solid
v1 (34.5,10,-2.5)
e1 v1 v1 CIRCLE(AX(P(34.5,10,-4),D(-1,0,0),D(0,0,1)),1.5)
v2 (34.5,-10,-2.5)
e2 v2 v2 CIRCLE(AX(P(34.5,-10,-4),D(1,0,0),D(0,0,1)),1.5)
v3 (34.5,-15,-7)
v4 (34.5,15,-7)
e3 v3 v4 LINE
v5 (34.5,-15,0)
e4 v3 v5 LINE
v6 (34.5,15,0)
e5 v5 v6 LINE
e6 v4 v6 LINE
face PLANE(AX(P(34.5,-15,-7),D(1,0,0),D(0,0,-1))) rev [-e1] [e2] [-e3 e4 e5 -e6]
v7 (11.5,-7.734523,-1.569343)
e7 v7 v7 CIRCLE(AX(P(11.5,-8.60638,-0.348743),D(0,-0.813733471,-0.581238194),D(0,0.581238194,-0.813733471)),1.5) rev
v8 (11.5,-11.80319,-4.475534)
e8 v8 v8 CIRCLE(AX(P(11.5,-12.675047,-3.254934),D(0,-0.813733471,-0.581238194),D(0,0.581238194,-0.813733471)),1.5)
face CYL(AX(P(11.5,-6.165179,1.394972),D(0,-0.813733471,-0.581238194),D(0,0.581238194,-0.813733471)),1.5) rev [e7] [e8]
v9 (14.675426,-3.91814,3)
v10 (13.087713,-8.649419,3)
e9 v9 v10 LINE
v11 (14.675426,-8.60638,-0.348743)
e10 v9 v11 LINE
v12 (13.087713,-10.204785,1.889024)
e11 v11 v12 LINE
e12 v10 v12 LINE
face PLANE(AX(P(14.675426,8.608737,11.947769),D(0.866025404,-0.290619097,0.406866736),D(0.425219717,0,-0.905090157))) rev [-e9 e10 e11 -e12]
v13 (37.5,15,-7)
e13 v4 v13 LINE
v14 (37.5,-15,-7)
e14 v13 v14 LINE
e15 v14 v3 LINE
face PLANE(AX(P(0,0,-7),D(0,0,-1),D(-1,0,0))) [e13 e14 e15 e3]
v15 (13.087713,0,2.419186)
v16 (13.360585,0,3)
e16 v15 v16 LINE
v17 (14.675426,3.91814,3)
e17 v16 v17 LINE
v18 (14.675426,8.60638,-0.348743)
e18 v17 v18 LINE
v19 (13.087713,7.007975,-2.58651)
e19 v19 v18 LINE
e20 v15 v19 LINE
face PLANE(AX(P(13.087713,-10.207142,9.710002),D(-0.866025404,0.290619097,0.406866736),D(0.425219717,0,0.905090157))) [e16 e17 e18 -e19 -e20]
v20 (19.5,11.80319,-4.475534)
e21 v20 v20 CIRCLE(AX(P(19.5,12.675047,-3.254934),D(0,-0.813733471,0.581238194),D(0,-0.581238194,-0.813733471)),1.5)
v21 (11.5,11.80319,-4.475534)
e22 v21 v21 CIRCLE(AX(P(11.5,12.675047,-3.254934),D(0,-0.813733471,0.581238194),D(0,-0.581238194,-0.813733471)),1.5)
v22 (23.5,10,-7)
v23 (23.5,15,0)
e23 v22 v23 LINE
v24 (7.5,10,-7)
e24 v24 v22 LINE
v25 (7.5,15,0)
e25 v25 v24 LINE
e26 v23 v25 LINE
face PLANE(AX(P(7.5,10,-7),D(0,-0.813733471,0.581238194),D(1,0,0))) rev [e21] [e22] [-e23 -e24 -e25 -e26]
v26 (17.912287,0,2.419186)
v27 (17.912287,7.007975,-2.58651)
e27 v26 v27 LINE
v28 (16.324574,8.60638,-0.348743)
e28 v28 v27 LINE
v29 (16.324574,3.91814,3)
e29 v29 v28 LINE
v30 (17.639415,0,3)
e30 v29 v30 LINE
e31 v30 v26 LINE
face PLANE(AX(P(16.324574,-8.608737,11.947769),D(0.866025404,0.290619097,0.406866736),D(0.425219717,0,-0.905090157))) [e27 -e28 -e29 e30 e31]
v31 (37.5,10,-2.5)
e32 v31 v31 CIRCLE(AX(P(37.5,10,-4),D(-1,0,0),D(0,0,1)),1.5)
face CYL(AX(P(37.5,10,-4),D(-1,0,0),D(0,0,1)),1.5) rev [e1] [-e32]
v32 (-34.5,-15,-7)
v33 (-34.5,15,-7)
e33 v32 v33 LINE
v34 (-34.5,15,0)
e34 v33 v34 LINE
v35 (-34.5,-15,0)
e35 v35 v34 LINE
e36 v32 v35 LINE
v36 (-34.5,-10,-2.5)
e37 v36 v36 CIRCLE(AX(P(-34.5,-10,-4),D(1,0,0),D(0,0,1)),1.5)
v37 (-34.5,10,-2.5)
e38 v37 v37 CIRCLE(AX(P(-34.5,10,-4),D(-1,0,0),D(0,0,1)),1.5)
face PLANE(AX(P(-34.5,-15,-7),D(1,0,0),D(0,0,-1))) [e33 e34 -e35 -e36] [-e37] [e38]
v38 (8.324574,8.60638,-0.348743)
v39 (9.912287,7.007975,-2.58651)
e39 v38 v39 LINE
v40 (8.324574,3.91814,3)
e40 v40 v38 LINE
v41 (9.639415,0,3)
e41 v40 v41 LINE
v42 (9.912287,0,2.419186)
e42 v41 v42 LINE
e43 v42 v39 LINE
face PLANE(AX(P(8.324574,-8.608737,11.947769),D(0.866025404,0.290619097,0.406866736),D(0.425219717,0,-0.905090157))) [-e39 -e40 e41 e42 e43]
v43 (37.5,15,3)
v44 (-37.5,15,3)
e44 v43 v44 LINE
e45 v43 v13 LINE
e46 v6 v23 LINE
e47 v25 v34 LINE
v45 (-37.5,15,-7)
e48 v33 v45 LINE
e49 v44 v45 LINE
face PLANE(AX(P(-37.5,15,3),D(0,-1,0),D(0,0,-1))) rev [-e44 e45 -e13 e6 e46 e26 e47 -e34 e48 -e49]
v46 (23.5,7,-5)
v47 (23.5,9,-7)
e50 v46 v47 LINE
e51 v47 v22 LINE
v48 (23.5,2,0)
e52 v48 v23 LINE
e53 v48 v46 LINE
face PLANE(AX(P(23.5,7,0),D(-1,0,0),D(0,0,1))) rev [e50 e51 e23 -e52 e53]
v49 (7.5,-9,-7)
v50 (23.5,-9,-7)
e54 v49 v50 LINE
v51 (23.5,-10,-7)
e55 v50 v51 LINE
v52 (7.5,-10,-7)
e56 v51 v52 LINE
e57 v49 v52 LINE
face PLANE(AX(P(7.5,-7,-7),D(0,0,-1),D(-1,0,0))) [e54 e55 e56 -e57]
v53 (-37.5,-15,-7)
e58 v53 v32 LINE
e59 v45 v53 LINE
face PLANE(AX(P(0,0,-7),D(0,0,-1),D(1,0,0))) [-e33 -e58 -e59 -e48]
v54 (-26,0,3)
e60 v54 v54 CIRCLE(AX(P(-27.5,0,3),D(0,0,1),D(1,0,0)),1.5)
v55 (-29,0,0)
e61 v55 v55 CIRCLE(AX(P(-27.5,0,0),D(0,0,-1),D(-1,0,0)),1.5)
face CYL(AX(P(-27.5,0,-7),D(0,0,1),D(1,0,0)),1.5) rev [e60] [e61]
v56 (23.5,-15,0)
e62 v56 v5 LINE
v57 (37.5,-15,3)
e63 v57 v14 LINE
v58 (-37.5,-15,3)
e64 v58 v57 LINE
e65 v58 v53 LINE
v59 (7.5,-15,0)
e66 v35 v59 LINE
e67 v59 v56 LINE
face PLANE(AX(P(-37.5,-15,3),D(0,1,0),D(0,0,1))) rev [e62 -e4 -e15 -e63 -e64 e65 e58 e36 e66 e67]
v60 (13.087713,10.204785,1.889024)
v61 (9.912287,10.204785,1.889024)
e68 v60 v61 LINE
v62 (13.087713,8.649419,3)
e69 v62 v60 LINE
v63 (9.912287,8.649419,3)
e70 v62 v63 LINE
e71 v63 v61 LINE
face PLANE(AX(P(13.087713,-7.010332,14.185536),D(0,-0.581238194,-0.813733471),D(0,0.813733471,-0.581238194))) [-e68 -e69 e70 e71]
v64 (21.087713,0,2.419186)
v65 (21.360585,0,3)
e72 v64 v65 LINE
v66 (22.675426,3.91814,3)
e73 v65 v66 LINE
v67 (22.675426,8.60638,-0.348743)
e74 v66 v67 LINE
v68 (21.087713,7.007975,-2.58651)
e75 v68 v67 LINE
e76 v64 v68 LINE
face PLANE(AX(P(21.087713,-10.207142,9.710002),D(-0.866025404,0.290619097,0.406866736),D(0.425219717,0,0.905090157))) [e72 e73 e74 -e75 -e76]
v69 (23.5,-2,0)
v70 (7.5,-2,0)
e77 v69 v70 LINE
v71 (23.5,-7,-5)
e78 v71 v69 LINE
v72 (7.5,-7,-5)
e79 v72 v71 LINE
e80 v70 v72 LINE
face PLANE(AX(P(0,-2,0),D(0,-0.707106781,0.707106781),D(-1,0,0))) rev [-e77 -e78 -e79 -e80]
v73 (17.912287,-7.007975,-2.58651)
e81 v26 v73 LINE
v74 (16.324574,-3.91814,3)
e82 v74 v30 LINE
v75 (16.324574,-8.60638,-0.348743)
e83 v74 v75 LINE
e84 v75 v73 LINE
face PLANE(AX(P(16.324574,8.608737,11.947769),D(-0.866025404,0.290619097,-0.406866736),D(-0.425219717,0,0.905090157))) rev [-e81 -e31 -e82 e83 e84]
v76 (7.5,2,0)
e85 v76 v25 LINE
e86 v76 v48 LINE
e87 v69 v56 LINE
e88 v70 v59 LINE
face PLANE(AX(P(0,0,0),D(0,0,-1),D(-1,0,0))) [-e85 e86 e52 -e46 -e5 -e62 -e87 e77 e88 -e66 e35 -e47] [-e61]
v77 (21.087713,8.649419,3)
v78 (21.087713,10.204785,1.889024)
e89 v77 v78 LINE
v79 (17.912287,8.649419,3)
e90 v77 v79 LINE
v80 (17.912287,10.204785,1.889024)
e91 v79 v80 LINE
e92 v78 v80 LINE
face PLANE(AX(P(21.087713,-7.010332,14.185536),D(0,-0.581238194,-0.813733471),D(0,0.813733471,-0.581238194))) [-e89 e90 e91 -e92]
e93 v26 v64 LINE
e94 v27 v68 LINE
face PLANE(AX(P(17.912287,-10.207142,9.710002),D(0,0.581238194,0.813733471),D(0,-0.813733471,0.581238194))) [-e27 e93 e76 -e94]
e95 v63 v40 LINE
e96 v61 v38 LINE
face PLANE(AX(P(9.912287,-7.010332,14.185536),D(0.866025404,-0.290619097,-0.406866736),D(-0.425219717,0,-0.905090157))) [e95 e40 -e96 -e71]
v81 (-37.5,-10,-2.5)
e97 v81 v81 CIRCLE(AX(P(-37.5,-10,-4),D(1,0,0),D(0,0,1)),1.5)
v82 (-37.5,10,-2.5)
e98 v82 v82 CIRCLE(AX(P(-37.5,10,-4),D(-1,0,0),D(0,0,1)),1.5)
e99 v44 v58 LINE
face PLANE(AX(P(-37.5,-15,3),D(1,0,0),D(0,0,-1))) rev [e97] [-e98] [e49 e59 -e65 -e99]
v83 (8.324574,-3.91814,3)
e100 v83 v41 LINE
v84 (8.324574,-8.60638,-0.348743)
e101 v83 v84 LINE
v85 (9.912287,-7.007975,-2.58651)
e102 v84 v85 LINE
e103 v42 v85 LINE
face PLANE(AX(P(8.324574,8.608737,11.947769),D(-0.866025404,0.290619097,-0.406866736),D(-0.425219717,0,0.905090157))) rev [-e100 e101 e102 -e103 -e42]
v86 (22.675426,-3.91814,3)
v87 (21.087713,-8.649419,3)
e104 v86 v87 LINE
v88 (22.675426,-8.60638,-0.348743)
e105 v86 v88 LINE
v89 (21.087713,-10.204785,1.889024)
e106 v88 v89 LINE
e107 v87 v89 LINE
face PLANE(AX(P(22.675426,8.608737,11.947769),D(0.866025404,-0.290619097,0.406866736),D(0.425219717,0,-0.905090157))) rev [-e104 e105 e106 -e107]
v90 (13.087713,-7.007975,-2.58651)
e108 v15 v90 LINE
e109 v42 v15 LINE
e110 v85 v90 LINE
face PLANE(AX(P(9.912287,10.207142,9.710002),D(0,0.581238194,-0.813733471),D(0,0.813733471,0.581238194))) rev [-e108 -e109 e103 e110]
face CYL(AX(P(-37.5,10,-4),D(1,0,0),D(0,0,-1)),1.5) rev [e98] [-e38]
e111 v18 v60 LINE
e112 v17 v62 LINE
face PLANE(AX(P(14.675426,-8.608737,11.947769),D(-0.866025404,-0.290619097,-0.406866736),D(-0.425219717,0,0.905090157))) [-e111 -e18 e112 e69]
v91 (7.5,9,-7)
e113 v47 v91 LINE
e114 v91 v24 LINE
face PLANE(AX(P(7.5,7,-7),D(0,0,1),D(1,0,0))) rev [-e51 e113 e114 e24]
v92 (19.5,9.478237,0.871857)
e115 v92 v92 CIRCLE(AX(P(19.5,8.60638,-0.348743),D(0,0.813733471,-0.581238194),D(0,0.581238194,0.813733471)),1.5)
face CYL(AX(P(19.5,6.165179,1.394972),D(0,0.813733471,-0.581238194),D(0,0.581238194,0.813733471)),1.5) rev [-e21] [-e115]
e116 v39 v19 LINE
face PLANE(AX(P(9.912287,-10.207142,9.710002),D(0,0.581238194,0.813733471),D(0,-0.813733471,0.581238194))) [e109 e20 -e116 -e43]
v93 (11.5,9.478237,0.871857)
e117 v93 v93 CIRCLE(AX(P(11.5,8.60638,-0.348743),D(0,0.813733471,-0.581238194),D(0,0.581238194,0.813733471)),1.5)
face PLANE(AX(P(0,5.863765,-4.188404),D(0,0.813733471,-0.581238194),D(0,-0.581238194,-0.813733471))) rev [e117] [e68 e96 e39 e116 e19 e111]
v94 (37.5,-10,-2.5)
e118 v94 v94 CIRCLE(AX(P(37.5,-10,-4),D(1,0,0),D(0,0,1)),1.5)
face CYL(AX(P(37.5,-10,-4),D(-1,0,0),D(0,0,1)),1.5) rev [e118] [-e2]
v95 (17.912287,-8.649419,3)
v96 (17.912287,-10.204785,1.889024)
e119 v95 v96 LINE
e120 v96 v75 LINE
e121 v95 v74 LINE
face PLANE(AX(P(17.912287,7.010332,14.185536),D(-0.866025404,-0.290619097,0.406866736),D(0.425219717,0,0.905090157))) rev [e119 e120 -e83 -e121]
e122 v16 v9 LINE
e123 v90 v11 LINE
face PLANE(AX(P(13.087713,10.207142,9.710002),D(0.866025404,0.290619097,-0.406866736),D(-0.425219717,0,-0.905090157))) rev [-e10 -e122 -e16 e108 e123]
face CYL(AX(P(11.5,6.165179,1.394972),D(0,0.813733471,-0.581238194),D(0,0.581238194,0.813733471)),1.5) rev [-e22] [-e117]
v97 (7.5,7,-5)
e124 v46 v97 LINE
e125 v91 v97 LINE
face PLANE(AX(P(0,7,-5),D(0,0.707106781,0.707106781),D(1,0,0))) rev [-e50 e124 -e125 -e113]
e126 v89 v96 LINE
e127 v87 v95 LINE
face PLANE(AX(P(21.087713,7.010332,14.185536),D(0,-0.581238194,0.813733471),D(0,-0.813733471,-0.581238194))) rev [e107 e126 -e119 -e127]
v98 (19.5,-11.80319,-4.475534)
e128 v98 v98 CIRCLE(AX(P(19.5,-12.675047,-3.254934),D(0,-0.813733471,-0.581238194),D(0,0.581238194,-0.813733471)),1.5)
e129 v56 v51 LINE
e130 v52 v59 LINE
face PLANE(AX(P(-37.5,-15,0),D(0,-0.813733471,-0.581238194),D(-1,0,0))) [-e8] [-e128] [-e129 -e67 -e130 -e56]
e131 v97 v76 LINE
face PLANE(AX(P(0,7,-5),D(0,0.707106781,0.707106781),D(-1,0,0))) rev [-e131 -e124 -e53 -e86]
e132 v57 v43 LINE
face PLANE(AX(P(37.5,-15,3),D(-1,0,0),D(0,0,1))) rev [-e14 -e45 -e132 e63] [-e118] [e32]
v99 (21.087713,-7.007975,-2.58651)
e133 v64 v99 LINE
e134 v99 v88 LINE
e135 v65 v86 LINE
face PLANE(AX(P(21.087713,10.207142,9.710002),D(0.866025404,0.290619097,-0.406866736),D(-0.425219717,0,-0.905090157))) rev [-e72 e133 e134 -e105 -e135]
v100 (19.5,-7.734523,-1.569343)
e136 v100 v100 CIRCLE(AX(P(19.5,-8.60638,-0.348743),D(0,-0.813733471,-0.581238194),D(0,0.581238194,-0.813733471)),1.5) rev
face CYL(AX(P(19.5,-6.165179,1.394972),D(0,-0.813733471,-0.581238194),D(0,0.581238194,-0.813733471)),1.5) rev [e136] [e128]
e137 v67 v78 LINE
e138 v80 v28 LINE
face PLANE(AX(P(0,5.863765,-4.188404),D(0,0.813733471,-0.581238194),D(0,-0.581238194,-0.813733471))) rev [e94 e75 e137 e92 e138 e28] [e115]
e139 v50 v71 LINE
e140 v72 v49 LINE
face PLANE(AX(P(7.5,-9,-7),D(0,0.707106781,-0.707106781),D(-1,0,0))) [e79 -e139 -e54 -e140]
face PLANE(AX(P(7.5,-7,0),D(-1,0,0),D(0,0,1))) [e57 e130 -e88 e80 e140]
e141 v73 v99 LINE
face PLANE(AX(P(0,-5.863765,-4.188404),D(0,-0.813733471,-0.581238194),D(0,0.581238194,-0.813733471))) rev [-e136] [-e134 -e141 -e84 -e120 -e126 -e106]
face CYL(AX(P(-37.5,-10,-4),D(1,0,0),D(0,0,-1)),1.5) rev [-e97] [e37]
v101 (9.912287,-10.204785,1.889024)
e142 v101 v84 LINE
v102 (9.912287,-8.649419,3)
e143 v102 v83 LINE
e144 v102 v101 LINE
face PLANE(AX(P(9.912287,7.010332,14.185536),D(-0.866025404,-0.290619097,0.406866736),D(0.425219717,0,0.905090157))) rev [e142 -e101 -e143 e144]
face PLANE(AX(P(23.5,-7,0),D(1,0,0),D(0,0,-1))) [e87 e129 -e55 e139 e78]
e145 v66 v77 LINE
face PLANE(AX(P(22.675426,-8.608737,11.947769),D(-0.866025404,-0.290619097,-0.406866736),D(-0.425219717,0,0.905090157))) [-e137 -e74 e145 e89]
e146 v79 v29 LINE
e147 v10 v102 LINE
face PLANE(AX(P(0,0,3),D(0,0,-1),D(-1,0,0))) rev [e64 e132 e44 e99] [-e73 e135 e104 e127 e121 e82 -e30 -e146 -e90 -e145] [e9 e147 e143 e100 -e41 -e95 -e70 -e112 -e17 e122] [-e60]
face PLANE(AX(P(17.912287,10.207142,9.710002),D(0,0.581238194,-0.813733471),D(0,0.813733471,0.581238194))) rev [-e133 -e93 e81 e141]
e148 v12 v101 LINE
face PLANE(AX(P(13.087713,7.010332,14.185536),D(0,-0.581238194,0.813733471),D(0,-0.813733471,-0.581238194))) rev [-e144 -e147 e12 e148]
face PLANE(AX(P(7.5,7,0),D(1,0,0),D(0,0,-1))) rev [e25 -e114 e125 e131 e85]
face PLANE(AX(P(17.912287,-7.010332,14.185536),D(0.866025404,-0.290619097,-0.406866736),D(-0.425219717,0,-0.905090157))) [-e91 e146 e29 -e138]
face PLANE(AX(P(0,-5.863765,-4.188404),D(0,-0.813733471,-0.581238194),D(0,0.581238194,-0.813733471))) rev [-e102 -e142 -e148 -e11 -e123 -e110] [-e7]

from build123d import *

# Parameters (mm, degrees)
SKETCH1_W               = 75
SKETCH1_H               = 30
BOSS_EXTRUDE1_DEPTH     = 3
SKETCH2_W               = 3
SKETCH2_H               = 30
BOSS_EXTRUDE2_DEPTH     = 7
SKETCH4_R               = 1.5
CUT_EXTRUDE1_DEPTH      = 3
MIRROR1_COPY_1_SKETCH_R = 1.5
MIRROR1_COPY_1_DEPTH    = 3
SKETCH5_W               = 16
SKETCH5_H               = 7
BOSS_EXTRUDE3_DEPTH     = 8
CHAMFER1_SIZE           = 5
CHAMFER1_SIZE2          = 7
CHAMFER2_SIZE           = 5
CHAMFER3_SIZE           = 2
SKETCH6_R               = 1.5
CUT_EXTRUDE2_DEPTH      = 8
CUT_EXTRUDE3_START      = -5
CUT_EXTRUDE3_DEPTH      = 42.149507332
CHAMFER4_SIZE           = 7
CHAMFER4_SIZE2          = 5
CHAMFER5_SIZE           = 5
CHAMFER6_SIZE           = 2
SKETCH8_R               = 1.5
CUT_EXTRUDE4_DEPTH      = 42.608292443


with BuildPart() as part:
    # Sketch1 → Boss-Extrude1 (new body)
    with BuildSketch(Plane.XY):
        Rectangle(SKETCH1_W, SKETCH1_H)
    extrude(amount=BOSS_EXTRUDE1_DEPTH)

    # Sketch2 → Boss-Extrude2 (add)
    with BuildSketch(Plane(origin=(0, 0, 0), x_dir=(-1, 0, 0), z_dir=(0, 0, -1))):
        with Locations((-36, 0)):
            Rectangle(SKETCH2_W, SKETCH2_H)
    boss_extrude2 = extrude(amount=BOSS_EXTRUDE2_DEPTH)

    # Sketch4 → Cut-Extrude1 (cut)
    with BuildSketch(Plane.ZY.offset(-34.5)):
        with Locations((-4, 10)):
            Circle(SKETCH4_R)
    cut_extrude1 = extrude(amount=-CUT_EXTRUDE1_DEPTH, mode=Mode.SUBTRACT)

    # Mirror2: Cut-Extrude1 across plane
    add(cut_extrude1.mirror(Plane.ZX), mode=Mode.SUBTRACT)

    # Mirror1: Boss-Extrude2, Cut-Extrude1 across plane
    add(boss_extrude2.mirror(Plane(origin=(0, 0, 0), x_dir=(0, 0, 1), z_dir=(1, 0, 0))))
    add(cut_extrude1.mirror(Plane(origin=(0, 0, 0), x_dir=(0, 0, 1), z_dir=(1, 0, 0))), mode=Mode.SUBTRACT)

    # Mirror1 copy 1 sketch → Mirror1 copy 1 (cut)
    with BuildSketch(Plane(origin=(-34.5, 0, 0), x_dir=(0, 0, 1), z_dir=(1, 0, 0))):
        with Locations((-4, 10)):
            Circle(MIRROR1_COPY_1_SKETCH_R)
    extrude(amount=-MIRROR1_COPY_1_DEPTH, mode=Mode.SUBTRACT)

    # Sketch5 → Boss-Extrude3 (add)
    with BuildSketch(Plane.XZ.offset(15)):
        with Locations((15.5, -3.5)):
            Rectangle(SKETCH5_W, SKETCH5_H)
    boss_extrude3 = extrude(amount=-BOSS_EXTRUDE3_DEPTH)

    # Chamfer1
    chamfer1_edges = [part.edges().sort_by_distance(p)[0] for p in [
        (15.5, -15, -7),
    ]]
    chamfer1_side = [part.faces().sort_by_distance(p)[0] for p in [
        (15.5, -11, -7),
    ]]
    chamfer(chamfer1_edges, length=CHAMFER1_SIZE, length2=CHAMFER1_SIZE2, reference=chamfer1_side[0])

    # Chamfer2
    chamfer2_edges = [part.edges().sort_by_distance(p)[0] for p in [
        (15.5, -7, 0),
    ]]
    chamfer(chamfer2_edges, length=CHAMFER2_SIZE)

    # Chamfer3
    chamfer3_edges = [part.edges().sort_by_distance(p)[0] for p in [
        (15.5, -7, -7),
    ]]
    chamfer(chamfer3_edges, length=CHAMFER3_SIZE - 0.0001)  # a hair under: the kernel refuses the full size

    # Sketch6 → Cut-Extrude2 (cut)
    with BuildSketch(Plane(origin=(0, -9.932432432, -7.094594595), x_dir=(1, 0, 0), z_dir=(0, -0.8137334712067358, -0.5812381937190955))):
        with Locations(Location((11.5, 4.718572906, 0), (0, 0, 270))):
            Circle(SKETCH6_R)
        with Locations(Location((19.5, 4.718572906, 0), (0, 0, 270))):
            Circle(SKETCH6_R)
    cut_extrude2 = extrude(amount=-CUT_EXTRUDE2_DEPTH, mode=Mode.SUBTRACT)

    # Sketch7 → Cut-Extrude3 (cut, through all)
    with BuildSketch(Plane(origin=(0, -9.932432432, -7.094594595), x_dir=(1, 0, 0), z_dir=(0, -0.8137334712067358, -0.5812381937190955)).offset(CUT_EXTRUDE3_START)):
        Polygon((8.324573519, 4.718572906), (9.91228676, 1.968572906), (13.08771324, 1.968572906), (14.675426481, 4.718572906), (13.08771324, 7.468572906), (9.91228676, 7.468572906), align=None)
        Polygon((16.324573519, 4.718572906), (17.91228676, 1.968572906), (21.08771324, 1.968572906), (22.675426481, 4.718572906), (21.08771324, 7.468572906), (17.91228676, 7.468572906), align=None)
    cut_extrude3 = extrude(amount=-CUT_EXTRUDE3_DEPTH, mode=Mode.SUBTRACT)

    # Mirror3: Boss-Extrude3 across plane
    add(boss_extrude3.mirror(Plane.ZX))

    # Chamfer4
    chamfer4_edges = [part.edges().sort_by_distance(p)[0] for p in [
        (15.5, 15, -7),
    ]]
    chamfer4_side = [part.faces().sort_by_distance(p)[0] for p in [
        (0, 15, 2.243362702),
    ]]
    chamfer(chamfer4_edges, length=CHAMFER4_SIZE, length2=CHAMFER4_SIZE2, reference=chamfer4_side[0])

    # Chamfer5
    chamfer5_edges = [part.edges().sort_by_distance(p)[0] for p in [
        (15.5, 7, 0),
    ]]
    chamfer(chamfer5_edges, length=CHAMFER5_SIZE)

    # Chamfer6
    chamfer6_edges = [part.edges().sort_by_distance(p)[0] for p in [
        (15.5, 7, -7),
    ]]
    chamfer(chamfer6_edges, length=CHAMFER6_SIZE - 0.0001)  # a hair under: the kernel refuses the full size

    # Mirror4: Cut-Extrude2, Cut-Extrude3 across plane
    add(cut_extrude2.mirror(Plane.ZX), mode=Mode.SUBTRACT)
    add(cut_extrude3.mirror(Plane.ZX), mode=Mode.SUBTRACT)

    # Sketch8 → Cut-Extrude4 (cut, through all)
    with BuildSketch(Plane.XY.offset(3)):
        with Locations((-27.5, 0)):
            Circle(SKETCH8_R)
    extrude(amount=-CUT_EXTRUDE4_DEPTH, mode=Mode.SUBTRACT)


solid = part.part
